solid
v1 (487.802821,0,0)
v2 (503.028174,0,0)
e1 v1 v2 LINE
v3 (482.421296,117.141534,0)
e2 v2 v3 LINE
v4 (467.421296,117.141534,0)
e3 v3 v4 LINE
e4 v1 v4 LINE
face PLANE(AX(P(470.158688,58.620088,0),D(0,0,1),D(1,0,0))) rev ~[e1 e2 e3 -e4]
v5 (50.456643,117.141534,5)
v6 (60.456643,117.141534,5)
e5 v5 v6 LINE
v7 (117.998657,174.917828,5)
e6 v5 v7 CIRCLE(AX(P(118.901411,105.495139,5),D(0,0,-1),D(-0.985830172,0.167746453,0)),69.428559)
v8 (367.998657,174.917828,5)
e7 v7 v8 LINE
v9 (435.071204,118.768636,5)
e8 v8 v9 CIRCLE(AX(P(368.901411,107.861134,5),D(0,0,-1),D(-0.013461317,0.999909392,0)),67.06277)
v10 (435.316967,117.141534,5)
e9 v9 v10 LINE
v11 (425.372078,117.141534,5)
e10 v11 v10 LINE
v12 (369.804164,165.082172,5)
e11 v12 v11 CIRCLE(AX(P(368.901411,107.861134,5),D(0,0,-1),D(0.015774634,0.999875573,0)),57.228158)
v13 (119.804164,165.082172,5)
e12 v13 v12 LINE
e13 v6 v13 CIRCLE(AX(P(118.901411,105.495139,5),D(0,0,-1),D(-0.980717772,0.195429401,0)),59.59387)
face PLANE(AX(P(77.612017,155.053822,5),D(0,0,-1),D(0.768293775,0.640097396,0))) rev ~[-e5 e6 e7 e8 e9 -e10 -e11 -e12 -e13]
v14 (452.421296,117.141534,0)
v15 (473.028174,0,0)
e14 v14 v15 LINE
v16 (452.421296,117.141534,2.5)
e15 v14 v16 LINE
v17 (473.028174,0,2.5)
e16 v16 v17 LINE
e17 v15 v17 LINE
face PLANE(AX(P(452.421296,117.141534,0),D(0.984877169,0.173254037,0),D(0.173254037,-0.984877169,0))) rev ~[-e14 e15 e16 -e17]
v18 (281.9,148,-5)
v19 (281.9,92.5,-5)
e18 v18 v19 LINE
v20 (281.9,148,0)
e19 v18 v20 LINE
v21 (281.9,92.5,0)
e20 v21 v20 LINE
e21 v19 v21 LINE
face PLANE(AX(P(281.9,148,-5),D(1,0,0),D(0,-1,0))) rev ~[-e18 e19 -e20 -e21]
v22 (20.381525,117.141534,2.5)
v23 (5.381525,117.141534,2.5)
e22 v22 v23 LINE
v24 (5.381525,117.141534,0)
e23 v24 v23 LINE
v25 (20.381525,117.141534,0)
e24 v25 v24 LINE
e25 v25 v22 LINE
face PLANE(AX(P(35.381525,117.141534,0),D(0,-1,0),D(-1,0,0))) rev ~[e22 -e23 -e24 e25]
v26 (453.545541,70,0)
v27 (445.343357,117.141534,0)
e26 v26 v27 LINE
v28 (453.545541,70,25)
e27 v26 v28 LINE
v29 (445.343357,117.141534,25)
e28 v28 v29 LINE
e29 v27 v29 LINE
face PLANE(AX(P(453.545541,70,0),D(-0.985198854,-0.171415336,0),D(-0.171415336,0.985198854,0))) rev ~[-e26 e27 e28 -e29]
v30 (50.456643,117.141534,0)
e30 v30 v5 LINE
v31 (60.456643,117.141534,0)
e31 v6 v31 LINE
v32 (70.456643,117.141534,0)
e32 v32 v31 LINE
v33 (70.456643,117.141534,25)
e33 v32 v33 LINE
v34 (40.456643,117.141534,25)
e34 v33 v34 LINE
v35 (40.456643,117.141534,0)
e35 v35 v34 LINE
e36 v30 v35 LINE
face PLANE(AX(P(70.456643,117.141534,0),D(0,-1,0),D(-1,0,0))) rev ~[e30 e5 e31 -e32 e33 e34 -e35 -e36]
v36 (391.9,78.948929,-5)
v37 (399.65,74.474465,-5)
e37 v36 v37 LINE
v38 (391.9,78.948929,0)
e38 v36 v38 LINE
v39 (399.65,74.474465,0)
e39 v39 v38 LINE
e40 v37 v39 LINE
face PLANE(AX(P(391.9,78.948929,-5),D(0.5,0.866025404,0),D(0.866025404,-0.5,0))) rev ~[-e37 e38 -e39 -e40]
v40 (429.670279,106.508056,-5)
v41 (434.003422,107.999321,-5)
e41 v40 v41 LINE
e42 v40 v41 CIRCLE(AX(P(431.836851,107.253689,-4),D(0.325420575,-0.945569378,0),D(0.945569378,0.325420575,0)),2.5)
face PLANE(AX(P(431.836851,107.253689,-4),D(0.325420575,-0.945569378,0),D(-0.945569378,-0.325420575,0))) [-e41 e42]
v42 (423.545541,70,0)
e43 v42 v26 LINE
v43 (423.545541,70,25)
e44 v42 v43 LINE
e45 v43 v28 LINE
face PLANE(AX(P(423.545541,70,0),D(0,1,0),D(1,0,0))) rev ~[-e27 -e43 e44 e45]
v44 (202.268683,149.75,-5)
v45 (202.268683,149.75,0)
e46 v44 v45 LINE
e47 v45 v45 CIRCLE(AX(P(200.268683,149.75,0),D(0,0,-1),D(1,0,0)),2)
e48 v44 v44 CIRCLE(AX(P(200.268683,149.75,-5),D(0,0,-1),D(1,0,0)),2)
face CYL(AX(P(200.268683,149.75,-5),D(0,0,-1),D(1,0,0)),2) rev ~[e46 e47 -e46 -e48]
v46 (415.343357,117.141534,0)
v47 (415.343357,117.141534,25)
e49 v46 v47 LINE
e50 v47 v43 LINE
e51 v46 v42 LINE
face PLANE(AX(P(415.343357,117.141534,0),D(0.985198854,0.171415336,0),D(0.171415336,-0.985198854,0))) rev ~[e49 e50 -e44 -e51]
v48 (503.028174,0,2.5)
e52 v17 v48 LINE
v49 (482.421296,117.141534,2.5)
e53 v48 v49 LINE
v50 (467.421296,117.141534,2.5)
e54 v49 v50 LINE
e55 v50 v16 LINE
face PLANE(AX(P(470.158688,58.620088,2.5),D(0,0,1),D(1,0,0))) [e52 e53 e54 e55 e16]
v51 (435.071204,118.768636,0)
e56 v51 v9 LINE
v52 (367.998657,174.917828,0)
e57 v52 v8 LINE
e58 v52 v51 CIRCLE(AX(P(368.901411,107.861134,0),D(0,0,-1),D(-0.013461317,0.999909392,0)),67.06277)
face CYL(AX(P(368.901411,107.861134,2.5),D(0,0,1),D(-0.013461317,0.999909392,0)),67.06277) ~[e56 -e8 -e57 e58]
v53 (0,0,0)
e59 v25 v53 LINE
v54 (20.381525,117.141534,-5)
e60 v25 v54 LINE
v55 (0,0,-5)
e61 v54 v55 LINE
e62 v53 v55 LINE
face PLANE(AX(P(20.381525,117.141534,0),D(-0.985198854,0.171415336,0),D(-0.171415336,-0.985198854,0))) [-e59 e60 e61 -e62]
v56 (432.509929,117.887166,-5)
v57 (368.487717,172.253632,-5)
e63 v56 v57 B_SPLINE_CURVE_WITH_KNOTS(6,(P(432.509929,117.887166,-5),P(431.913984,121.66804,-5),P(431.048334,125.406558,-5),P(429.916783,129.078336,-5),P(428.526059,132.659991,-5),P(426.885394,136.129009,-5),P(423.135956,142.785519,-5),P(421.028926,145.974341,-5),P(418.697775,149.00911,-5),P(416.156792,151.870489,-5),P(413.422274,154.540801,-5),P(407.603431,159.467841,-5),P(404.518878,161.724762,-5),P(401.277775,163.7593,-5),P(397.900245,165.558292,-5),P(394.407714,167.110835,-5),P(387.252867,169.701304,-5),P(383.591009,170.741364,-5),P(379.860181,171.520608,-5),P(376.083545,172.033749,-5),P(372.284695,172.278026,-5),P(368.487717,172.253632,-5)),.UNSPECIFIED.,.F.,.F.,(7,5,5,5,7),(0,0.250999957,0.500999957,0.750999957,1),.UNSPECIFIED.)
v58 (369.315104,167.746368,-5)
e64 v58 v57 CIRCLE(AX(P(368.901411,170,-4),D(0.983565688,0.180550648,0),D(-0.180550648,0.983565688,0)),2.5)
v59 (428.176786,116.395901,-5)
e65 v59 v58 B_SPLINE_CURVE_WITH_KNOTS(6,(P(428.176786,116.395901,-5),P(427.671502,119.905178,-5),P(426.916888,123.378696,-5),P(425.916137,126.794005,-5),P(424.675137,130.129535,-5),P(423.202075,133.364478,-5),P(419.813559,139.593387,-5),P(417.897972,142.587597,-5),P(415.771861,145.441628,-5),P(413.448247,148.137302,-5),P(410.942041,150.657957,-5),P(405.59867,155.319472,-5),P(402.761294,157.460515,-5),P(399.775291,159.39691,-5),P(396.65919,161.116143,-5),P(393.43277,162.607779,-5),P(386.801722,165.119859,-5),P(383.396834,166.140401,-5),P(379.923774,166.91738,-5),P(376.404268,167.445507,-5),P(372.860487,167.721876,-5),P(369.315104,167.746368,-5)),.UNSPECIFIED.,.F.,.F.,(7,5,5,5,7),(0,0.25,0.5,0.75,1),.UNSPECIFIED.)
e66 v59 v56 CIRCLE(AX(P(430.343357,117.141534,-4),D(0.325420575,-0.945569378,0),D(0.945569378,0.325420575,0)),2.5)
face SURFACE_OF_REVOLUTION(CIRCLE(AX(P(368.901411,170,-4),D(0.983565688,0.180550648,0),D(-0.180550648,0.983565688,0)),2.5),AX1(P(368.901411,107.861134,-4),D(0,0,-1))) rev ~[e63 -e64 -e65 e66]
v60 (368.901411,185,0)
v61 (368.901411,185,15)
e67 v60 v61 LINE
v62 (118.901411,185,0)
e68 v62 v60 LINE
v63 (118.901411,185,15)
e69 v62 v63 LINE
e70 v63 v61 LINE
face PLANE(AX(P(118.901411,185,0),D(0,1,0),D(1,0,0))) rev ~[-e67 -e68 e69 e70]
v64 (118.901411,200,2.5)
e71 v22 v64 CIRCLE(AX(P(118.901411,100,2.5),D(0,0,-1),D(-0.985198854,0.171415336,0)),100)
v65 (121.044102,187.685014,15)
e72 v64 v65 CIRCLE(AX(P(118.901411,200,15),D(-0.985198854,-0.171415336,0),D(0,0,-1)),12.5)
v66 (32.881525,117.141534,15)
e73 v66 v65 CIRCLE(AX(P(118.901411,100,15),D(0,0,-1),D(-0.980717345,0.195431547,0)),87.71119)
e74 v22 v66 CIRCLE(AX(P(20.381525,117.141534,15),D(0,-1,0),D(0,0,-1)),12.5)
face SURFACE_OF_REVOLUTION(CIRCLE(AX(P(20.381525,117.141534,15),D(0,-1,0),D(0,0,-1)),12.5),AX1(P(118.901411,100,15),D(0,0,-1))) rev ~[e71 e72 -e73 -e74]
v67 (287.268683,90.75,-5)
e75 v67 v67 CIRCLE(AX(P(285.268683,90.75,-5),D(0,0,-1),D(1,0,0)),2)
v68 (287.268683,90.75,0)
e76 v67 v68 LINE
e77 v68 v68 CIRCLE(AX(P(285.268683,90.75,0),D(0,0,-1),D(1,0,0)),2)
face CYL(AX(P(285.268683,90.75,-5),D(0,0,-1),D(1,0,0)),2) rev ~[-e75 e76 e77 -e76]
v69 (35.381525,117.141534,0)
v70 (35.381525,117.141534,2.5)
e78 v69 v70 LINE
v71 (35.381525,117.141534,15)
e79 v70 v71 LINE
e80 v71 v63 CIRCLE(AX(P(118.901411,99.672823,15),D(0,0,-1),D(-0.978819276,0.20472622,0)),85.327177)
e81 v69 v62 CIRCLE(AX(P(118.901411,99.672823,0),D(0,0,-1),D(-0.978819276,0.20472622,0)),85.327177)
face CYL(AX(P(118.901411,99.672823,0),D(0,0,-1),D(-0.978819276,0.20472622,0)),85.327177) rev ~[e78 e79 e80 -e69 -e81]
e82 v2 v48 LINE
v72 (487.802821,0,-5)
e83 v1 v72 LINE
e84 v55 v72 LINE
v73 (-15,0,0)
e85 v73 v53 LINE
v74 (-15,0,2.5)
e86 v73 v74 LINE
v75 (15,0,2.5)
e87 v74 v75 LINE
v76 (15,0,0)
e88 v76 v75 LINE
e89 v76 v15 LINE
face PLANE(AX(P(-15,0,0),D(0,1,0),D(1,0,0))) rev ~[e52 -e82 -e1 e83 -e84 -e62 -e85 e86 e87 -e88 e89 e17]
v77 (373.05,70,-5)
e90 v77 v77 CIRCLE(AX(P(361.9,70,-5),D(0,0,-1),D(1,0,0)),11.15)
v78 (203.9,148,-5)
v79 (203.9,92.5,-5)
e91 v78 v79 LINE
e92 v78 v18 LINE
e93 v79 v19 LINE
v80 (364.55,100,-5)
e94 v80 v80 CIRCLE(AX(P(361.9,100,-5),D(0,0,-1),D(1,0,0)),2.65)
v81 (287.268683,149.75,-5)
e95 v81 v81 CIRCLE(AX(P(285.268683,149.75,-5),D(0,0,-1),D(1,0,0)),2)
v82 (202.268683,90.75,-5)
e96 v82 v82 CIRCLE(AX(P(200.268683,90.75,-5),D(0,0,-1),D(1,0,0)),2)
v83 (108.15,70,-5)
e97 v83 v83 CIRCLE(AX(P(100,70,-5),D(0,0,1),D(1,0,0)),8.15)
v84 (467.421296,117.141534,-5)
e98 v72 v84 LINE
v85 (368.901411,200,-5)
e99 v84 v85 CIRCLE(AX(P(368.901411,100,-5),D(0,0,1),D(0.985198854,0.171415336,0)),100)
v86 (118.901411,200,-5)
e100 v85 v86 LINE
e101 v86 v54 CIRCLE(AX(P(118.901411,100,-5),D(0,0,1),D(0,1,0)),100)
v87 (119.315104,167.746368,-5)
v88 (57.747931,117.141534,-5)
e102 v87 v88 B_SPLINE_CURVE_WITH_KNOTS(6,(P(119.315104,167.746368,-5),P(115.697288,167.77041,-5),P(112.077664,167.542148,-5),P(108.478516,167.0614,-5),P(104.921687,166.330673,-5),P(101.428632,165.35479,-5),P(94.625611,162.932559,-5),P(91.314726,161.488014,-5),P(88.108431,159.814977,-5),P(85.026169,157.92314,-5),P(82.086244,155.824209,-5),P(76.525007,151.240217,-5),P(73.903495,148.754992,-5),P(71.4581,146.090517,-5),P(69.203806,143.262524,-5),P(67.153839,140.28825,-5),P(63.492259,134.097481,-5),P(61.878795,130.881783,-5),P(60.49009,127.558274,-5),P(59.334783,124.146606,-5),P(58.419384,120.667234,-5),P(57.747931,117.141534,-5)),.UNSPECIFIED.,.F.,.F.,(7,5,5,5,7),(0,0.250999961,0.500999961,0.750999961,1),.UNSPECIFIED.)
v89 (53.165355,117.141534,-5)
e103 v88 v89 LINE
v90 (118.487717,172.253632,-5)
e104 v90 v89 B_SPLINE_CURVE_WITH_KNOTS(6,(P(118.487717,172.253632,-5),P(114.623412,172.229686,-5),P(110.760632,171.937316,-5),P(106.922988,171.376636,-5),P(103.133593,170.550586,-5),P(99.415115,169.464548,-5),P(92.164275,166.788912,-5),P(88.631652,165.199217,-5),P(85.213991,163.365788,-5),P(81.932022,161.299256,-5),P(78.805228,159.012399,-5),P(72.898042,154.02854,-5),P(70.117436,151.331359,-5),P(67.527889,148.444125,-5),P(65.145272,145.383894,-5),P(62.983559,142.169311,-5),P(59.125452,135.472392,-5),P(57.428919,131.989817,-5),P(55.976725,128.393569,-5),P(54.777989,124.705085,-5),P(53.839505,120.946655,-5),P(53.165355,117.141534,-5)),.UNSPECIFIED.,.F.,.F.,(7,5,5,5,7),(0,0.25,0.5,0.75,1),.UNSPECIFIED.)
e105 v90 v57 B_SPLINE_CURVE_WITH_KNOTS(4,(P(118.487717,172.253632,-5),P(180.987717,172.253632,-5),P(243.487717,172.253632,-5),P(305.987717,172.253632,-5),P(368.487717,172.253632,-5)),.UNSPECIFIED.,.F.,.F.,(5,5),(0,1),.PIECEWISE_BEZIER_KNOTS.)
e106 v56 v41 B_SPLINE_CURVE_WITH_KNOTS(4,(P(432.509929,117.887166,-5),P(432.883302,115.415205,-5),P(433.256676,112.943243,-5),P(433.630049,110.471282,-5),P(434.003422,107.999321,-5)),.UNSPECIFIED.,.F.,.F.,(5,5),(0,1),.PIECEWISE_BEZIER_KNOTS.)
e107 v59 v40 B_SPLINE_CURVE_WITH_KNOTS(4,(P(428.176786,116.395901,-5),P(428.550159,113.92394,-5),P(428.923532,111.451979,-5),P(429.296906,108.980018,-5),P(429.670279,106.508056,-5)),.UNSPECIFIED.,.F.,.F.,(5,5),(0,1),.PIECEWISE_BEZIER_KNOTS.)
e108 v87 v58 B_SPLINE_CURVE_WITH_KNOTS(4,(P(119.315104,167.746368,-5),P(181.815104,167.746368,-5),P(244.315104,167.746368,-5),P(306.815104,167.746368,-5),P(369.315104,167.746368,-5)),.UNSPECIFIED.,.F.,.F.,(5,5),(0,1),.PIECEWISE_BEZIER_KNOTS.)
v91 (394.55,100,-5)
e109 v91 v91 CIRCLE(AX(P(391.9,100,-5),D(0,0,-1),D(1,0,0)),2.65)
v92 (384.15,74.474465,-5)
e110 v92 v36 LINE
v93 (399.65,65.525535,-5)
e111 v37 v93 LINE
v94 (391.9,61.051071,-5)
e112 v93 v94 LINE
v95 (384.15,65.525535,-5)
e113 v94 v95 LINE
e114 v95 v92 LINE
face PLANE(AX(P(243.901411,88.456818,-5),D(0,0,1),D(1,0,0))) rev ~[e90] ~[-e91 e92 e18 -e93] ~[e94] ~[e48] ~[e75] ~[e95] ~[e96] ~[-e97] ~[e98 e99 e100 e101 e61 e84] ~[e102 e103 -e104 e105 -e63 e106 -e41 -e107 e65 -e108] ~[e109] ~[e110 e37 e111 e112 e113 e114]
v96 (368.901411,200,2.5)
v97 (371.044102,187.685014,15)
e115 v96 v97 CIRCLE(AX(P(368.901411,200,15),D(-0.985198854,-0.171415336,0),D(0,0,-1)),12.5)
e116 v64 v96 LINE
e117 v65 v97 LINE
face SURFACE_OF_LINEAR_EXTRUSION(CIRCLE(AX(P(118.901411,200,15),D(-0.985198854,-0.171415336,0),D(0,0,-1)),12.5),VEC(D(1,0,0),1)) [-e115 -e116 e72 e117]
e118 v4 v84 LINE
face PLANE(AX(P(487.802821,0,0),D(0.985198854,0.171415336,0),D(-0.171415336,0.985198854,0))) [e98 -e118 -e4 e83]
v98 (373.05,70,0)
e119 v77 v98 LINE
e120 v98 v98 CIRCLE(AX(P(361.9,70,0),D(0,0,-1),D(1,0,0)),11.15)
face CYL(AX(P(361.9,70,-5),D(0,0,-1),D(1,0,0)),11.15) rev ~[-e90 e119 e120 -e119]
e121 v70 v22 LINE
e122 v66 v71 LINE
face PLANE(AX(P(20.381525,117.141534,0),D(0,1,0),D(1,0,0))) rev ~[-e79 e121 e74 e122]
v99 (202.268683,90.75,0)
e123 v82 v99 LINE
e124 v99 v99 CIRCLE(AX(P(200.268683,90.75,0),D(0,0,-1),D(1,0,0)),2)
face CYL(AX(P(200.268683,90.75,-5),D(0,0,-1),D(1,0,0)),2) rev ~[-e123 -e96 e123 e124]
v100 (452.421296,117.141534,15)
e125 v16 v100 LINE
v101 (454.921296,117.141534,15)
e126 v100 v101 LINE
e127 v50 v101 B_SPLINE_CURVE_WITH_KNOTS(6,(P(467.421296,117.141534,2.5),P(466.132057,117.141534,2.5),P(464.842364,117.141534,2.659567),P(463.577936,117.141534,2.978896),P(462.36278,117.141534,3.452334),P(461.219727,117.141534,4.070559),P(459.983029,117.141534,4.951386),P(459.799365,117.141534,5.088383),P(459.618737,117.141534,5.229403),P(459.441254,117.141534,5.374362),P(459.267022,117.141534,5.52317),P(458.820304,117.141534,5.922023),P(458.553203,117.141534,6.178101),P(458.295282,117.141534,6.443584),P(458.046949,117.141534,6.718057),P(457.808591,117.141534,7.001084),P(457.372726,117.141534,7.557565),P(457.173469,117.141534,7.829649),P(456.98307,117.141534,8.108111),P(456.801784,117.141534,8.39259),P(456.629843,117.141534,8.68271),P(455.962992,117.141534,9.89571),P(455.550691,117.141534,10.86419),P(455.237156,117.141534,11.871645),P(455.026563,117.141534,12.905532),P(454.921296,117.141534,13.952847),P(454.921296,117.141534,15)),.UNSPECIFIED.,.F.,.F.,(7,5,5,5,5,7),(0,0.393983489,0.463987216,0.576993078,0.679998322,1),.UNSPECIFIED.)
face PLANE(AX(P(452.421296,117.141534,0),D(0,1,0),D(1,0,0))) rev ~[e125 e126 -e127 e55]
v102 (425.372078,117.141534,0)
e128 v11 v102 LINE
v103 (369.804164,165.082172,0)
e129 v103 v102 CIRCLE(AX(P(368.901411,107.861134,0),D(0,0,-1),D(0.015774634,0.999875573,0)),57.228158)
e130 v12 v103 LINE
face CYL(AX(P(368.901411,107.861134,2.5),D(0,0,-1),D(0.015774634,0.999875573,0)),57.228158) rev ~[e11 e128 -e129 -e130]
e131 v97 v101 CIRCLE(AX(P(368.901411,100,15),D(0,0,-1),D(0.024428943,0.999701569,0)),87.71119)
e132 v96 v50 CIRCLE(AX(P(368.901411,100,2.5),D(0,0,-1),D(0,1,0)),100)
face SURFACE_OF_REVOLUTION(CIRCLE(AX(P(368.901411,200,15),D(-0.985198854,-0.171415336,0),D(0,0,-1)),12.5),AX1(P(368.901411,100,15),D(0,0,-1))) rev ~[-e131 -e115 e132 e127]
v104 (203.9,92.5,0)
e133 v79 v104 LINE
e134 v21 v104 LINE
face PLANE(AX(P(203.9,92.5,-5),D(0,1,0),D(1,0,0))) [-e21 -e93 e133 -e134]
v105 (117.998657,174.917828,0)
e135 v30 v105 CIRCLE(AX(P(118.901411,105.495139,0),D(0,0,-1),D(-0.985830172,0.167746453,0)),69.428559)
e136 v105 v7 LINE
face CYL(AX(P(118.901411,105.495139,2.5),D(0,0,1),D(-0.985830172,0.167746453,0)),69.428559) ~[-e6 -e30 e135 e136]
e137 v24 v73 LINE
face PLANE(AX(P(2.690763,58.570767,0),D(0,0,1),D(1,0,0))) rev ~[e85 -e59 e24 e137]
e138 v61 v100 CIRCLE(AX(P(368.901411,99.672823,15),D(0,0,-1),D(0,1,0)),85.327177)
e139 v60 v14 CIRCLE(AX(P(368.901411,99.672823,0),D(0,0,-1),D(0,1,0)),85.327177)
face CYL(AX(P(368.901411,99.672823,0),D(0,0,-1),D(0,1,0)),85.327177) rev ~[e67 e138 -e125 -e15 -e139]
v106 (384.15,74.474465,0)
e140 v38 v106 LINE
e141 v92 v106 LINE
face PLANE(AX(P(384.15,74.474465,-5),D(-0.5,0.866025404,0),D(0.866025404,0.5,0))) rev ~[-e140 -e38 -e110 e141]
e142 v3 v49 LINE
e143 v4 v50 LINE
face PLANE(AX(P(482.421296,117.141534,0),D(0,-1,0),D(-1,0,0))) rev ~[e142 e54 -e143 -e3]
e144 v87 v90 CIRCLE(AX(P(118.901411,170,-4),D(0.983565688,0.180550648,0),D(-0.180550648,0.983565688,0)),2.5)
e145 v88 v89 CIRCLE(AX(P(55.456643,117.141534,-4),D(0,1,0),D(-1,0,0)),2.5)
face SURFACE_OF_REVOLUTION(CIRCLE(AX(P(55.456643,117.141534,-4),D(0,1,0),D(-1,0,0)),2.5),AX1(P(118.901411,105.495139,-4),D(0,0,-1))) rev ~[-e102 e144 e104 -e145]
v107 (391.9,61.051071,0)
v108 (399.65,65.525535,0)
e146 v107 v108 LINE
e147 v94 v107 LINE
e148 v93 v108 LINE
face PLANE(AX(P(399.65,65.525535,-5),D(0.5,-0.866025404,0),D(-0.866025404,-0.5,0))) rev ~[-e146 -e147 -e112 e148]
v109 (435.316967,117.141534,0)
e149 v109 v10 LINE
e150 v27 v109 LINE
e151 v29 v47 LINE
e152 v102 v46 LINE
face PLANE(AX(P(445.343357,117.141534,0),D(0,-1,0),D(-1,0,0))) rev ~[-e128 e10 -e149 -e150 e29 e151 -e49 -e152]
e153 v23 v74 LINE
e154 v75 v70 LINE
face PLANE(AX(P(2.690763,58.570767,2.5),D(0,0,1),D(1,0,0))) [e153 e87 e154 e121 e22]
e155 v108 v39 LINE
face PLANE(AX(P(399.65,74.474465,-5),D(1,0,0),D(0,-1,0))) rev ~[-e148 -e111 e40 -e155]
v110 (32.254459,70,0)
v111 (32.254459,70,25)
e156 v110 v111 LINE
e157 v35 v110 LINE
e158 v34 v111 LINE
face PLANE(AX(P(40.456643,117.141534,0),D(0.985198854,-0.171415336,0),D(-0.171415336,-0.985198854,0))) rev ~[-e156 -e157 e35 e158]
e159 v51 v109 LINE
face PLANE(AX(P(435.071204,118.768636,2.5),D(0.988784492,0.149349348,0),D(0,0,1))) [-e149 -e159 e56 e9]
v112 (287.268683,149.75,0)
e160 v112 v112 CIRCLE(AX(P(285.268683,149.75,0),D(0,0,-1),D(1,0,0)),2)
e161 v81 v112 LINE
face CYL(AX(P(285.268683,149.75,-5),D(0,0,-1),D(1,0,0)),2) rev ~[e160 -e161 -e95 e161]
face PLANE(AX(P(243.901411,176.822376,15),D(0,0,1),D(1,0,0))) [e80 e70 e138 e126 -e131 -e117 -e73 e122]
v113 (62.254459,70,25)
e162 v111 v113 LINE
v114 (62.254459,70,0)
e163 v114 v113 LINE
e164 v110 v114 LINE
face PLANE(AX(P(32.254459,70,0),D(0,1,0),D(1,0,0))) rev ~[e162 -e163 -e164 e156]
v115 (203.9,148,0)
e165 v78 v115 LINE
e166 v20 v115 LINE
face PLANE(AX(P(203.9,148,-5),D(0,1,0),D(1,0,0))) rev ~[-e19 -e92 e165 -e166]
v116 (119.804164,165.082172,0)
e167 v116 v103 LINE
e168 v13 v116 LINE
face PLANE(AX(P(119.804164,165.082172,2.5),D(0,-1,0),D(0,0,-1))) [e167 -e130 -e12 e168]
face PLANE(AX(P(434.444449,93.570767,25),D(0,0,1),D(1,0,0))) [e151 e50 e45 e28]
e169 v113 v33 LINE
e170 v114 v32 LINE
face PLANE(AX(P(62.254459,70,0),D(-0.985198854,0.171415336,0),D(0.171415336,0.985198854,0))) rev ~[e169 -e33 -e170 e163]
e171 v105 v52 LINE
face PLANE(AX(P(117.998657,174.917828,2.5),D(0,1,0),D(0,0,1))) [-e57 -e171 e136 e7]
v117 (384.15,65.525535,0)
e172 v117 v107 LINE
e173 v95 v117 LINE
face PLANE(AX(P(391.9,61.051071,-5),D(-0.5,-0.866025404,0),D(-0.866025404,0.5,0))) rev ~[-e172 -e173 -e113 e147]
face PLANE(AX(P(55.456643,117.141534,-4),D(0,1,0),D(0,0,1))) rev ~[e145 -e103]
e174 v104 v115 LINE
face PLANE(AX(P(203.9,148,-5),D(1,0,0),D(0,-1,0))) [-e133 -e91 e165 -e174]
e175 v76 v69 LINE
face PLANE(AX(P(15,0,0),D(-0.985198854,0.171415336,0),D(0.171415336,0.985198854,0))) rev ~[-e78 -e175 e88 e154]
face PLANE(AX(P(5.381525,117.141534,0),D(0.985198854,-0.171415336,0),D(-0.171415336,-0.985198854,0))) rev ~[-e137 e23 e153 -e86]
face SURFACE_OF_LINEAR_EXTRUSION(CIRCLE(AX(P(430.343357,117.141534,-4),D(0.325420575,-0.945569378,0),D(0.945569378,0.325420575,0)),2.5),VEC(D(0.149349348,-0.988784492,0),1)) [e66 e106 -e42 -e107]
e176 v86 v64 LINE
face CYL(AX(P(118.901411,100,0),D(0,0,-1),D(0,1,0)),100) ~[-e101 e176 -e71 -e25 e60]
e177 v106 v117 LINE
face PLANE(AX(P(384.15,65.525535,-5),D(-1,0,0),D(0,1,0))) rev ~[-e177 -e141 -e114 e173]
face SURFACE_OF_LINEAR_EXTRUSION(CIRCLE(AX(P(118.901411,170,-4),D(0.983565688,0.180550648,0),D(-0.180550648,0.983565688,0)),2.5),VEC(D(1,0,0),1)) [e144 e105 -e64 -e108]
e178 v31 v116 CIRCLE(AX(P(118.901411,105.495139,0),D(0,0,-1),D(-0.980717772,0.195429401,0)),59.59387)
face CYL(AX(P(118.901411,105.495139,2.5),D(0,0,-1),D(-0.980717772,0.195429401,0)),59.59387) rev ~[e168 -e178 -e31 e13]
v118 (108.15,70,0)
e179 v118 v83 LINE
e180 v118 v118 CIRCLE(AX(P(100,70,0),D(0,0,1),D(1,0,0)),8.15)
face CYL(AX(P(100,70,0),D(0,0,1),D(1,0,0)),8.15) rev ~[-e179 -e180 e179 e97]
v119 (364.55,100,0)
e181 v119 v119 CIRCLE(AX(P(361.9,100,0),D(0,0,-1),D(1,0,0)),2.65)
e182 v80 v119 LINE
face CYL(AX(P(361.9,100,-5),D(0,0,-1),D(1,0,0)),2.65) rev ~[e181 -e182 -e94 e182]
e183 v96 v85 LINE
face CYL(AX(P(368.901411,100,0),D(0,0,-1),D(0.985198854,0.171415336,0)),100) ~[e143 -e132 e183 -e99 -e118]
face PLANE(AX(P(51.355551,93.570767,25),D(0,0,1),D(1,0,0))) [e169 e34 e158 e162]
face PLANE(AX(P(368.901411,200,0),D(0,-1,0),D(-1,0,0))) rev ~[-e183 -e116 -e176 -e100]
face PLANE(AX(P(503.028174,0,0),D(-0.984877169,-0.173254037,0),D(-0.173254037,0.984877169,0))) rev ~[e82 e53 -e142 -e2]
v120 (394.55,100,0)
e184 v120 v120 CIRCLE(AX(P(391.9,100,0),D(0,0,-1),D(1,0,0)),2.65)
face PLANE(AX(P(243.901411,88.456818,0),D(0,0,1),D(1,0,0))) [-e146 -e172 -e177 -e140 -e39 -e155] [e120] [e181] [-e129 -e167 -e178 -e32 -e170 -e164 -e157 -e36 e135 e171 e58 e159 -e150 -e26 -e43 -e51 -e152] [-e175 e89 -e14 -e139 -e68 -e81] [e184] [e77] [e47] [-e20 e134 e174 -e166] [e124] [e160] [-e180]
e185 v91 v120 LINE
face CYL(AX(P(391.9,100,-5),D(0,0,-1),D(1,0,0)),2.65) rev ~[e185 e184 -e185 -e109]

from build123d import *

# Parameters (mm, degrees)
F1_DEPTH  = 5
F3_DEPTH  = 15
F8_DEPTH  = 2.5
F9_W      = 78
F9_H      = 55.5
F9_R      = 2
F10_DEPTH = 25
F11_R     = 11.15
F11_R_2   = 2.65
F12_DEPTH = 25
F13_R     = 8.15
F14_DEPTH = 25
F16_DEPTH = 25
F17_W     = 10
F17_H     = 5
F17_R     = 2.5


with BuildPart() as f1:
    # F0 (on Top) → F1 (new body)
    with BuildSketch(Plane.XY):
        with BuildLine():
            Line((20.3815252042, 117.1415335559), (0, 0))
            Line((0, 0), (487.8028212909, 0))
            Line((487.8028212909, 0), (467.4212960867, 117.1415335559))
            ThreePointArc((467.4212960867, 117.1415335559), (433.2669551721, 176.5315404118), (368.9014106455, 200))
            Line((368.9014106455, 200), (118.9014106455, 200))
            ThreePointArc((118.9014106455, 200), (54.5358661189, 176.5315404118), (20.3815252042, 117.1415335559))
        make_face()
    extrude(amount=-F1_DEPTH)

    # F2 (on face) → F3 (join)
    with BuildSketch(Plane.XY):
        with BuildLine():
            Line((368.9014106455, 200), (118.9014106455, 200))
            ThreePointArc((118.9014106455, 200), (54.5358661189, 176.5315404118), (20.3815252042, 117.1415335559))
            Line((20.3815252042, 117.1415335559), (35.3815252042, 117.1415335559))
            ThreePointArc((35.3815252042, 117.1415335559), (65.0954102081, 165.8969986874), (118.9014106455, 185))
            Line((118.9014106455, 185), (368.9014106455, 185))
            ThreePointArc((368.9014106455, 185), (422.7074110828, 165.8969986874), (452.4212960867, 117.1415335559))
            Line((452.4212960867, 117.1415335559), (467.4212960867, 117.1415335559))
            ThreePointArc((467.4212960867, 117.1415335559), (433.2669551721, 176.5315404118), (368.9014106455, 200))
        make_face()
    extrude(amount=F3_DEPTH)

    # F6: sweep along a path in F5
    with BuildLine(Plane.XY.offset(15)) as f6_path:
        ThreePointArc((20.3815252042, 117.1415335559), (54.5358661189, 176.5315404118), (118.9014106455, 200))
        Line((118.9014106455, 200), (368.9014106455, 200))
        ThreePointArc((368.9014106455, 200), (433.2669551721, 176.5315404118), (467.4212960867, 117.1415335559))
    # F4 (on face) → F6 (sweep, cut)
    with BuildSketch(Plane.XZ.offset(-117.1415335559)):
        with BuildLine():
            ThreePointArc((20.3815252042, 2.5), (29.2203599691, 6.1611652352), (32.8815252042, 15))
            Line((32.8815252042, 15), (20.3815252042, 15))
            Line((20.3815252042, 15), (20.3815252042, 2.5))
        make_face()
    sweep(path=f6_path.line, mode=Mode.SUBTRACT)

    # F7 (on face) → F8 (join)
    with BuildSketch(Plane.XY):
        Polygon((-15, 0), (0, 0), (20.3815252042, 117.1415335559), (5.3815252042, 117.1415335559), align=None)
        Polygon((0, 0), (15, 0), (35.3815252042, 117.1415335559), (20.3815252042, 117.1415335559), align=None)
        Polygon((452.4212960867, 117.1415335559), (473.0281739523, 0), (487.8028212909, 0), (467.4212960867, 117.1415335559), align=None)
        Polygon((467.4212960867, 117.1415335559), (487.8028212909, 0), (503.0281739523, 0), (482.4212960867, 117.1415335559), align=None)
    extrude(amount=F8_DEPTH)

    # F9 (on face) → F10 (cut)
    with BuildSketch(Plane(origin=(0, 0, -5), x_dir=(1, 0, 0), z_dir=(0, 0, -1))):
        with Locations((242.9, -120.25)):
            Rectangle(F9_W, F9_H)
        with Locations((200.2686832967, -149.75)):
            Circle(F9_R)
        with Locations((200.2686832967, -90.75)):
            Circle(F9_R)
        with Locations((285.2686832967, -90.75)):
            Circle(F9_R)
        with Locations((285.2686832967, -149.75)):
            Circle(F9_R)
    extrude(amount=-F10_DEPTH, mode=Mode.SUBTRACT)

    # F11 (on face) → F12 (cut)
    with BuildSketch(Plane(origin=(0, 0, -5), x_dir=(1, 0, 0), z_dir=(0, 0, -1))):
        Polygon((391.9, -78.9489291724), (399.65, -74.4744645862), (399.65, -65.5255354138), (391.9, -61.0510708276), (384.15, -65.5255354138), (384.15, -74.4744645862), align=None)
        with Locations((361.9, -70)):
            Circle(F11_R)
        with Locations((361.9, -100)):
            Circle(F11_R_2)
        with Locations((391.9, -100)):
            Circle(F11_R_2)
    extrude(amount=-F12_DEPTH, mode=Mode.SUBTRACT)

    # F13 (on face) → F14 (cut)
    with BuildSketch(Plane.XY):
        with Locations((100, 70)):
            Circle(F13_R)
    extrude(amount=-F14_DEPTH, mode=Mode.SUBTRACT)

    # F15 (on face) → F16 (join)
    with BuildSketch(Plane.XY):
        Polygon((40.456642758, 117.1415335559), (32.2544592526, 70), (62.2544592526, 70), (70.456642758, 117.1415335559), align=None)
        Polygon((415.343357242, 117.1415335559), (423.5455407474, 70), (453.5455407474, 70), (445.343357242, 117.1415335559), align=None)
    extrude(amount=F16_DEPTH)

    # F19: sweep along a path in F18
    with BuildLine(Plane.XY) as f19_path:
        ThreePointArc((55.456642758, 117.1415335559), (77.6120171917, 155.0538221629), (118.9014106455, 170))
        Line((118.9014106455, 170), (368.9014106455, 170))
        ThreePointArc((368.9014106455, 170), (409.4264963221, 154.9669307173), (430.343357242, 117.1415335559))
        Line((430.343357242, 117.1415335559), (431.8368507266, 107.2536886334))
    # F17 (on face) → F19 (sweep)
    with BuildSketch(Plane(origin=(0, 117.1415335559, 0), x_dir=(-1, 0, 0), z_dir=(0, 1, 0))):
        with Locations((-55.456642758, 2.5)):
            Rectangle(F17_W, F17_H)
        with Locations((-55.456642758, -4)):
            Circle(F17_R)
    sweep(path=f19_path.line)


solid = f1.part
